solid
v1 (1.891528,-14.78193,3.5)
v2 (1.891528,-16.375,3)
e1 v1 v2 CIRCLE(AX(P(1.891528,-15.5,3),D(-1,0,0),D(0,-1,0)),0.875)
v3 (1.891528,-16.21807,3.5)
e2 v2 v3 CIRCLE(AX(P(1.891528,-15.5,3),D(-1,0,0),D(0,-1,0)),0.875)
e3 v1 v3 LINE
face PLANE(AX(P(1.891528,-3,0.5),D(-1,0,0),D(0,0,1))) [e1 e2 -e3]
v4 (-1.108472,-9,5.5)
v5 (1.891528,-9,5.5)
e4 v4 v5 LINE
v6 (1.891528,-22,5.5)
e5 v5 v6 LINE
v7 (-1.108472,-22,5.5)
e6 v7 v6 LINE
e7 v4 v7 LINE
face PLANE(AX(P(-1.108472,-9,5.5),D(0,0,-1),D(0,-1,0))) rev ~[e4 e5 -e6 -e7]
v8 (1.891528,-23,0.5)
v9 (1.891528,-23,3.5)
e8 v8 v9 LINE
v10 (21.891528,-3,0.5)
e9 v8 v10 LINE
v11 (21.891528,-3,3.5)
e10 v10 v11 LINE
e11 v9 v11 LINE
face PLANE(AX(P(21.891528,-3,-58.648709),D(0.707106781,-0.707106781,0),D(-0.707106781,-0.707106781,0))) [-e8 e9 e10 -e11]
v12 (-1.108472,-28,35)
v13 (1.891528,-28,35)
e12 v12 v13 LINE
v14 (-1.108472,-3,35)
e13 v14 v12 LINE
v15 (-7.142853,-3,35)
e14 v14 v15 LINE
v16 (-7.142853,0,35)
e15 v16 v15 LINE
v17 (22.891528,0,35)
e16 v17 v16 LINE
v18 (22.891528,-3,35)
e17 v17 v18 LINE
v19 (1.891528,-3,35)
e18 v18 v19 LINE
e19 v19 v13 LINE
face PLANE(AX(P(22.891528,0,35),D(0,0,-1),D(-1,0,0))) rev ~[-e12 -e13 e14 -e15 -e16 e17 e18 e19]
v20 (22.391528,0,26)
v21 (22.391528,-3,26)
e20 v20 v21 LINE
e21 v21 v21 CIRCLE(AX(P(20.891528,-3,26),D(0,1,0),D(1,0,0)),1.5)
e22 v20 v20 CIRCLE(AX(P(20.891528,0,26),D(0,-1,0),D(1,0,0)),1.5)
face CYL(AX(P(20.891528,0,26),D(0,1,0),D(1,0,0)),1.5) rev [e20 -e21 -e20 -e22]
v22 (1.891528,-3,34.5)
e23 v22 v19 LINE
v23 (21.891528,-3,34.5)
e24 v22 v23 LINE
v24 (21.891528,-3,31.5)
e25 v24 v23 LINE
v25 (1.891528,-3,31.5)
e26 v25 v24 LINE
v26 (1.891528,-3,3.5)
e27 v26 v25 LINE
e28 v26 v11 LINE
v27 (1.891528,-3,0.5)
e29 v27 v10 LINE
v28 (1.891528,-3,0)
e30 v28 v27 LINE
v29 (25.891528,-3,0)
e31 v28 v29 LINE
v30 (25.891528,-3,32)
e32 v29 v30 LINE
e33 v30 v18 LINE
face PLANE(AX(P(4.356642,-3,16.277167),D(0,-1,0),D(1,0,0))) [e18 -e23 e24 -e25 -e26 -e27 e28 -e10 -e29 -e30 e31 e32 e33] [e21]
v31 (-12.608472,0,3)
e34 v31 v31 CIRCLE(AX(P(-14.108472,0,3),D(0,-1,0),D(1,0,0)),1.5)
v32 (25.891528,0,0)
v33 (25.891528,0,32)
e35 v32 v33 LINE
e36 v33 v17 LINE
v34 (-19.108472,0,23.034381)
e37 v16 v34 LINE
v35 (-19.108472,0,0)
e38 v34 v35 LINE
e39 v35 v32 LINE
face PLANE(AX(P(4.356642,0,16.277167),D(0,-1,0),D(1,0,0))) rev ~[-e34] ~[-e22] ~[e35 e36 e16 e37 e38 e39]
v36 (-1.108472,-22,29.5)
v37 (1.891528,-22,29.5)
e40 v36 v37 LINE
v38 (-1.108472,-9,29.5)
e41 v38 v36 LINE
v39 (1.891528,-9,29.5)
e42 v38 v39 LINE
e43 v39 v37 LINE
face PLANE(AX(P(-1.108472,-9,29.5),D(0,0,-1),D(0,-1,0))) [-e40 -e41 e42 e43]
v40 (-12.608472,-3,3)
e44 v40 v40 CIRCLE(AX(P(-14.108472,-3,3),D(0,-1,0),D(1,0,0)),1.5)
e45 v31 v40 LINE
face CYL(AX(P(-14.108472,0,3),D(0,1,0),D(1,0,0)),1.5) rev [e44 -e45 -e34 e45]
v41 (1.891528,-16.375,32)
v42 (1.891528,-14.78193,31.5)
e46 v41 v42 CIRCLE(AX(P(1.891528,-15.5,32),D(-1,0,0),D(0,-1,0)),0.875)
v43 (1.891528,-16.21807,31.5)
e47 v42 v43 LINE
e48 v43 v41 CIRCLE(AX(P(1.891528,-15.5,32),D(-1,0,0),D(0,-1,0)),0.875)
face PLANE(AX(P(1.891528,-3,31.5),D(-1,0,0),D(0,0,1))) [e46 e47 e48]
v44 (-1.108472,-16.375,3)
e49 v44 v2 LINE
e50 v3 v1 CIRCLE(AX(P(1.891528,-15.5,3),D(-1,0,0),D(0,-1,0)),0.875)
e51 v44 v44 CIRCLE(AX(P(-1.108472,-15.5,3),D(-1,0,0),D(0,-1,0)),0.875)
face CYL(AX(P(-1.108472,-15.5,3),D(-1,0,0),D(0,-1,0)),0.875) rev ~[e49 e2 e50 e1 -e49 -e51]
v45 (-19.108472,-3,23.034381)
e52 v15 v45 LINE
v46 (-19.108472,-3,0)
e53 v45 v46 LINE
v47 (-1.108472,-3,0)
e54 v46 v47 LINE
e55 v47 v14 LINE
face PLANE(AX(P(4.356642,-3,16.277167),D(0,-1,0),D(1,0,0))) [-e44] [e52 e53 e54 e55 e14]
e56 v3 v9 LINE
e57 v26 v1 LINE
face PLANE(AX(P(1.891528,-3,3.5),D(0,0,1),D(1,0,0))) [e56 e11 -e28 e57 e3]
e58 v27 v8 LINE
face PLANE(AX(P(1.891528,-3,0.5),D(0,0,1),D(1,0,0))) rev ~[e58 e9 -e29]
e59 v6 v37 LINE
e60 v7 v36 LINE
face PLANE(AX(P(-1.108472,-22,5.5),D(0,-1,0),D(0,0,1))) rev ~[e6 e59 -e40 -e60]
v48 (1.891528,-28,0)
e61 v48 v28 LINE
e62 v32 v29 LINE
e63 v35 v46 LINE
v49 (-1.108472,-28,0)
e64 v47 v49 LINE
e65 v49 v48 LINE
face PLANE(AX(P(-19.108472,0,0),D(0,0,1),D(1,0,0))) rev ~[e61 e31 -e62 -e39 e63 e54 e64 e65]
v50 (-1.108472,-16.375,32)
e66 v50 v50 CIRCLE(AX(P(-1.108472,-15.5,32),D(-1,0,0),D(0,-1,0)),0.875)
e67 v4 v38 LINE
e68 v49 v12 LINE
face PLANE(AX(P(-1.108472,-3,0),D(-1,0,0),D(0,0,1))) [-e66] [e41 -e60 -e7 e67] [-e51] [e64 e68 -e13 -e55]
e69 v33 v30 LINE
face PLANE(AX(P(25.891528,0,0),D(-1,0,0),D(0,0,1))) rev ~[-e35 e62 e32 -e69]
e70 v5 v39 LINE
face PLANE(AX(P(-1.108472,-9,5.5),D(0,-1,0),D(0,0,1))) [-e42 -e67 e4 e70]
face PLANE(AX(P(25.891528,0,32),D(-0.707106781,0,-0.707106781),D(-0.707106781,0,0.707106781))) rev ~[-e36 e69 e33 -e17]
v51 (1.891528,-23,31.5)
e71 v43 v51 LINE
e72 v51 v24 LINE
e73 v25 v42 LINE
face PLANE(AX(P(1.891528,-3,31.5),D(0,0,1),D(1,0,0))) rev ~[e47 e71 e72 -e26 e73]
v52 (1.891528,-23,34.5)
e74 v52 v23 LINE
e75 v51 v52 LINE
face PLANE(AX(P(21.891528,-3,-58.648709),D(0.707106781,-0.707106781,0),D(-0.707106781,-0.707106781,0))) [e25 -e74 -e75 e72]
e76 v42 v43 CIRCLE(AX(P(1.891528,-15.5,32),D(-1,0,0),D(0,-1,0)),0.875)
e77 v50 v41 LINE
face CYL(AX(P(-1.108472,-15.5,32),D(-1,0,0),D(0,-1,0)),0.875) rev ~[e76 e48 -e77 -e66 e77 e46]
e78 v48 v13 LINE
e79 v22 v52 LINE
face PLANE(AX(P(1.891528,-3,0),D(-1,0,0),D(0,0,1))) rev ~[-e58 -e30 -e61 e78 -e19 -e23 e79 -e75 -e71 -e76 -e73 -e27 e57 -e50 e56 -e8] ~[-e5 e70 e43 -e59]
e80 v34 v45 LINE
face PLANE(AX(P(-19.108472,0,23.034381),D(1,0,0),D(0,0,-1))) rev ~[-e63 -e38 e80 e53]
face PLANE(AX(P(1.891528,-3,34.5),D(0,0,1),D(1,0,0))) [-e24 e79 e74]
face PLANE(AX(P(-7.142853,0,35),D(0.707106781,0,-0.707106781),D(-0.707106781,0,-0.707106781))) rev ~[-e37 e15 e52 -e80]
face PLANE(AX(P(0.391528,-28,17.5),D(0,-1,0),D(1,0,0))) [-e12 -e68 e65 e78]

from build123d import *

# Parameters (mm, degrees)
F0_R        = 1.5
F1_DEPTH    = 3
F2_W        = 3
F2_H        = 35
F3_DEPTH    = 25
F4_W        = 13
F4_H        = 24
F4_R        = 0.875
F5_DEPTH    = 27.001
F6_W        = 20
F6_H        = 3
F7_DEPTH    = 23
F8_T4_DEPTH = 121.2974174464


# Not quite as in the source:
# - a fillet or chamfer that OpenCascade refuses, or shapes differently, is made with other operations: its cross-section is extruded or revolved along the edge and cut away or added
# - a feature of the source that left no trace in its solid (it failed there, or was rolled back) is left out


with BuildPart() as f1:
    # F0 (on Front) → F1 (new body)
    with BuildSketch(Plane.XZ):
        Polygon((-19.1084720148, 23.034380586), (-19.1084720148, 0), (25.8915279852, 0), (25.8915279852, 32), (22.8915279852, 35), (-7.1428526009, 35), align=None)
        with Locations((-14.1084720148, 3)):
            Circle(F0_R, mode=Mode.SUBTRACT)
        with Locations((20.8915279852, 26)):
            Circle(F0_R, mode=Mode.SUBTRACT)
    extrude(amount=F1_DEPTH)

    # F2 (on face) → F3 (join)
    with BuildSketch(Plane.XZ.offset(3)):
        with Locations((0.3915279852, 17.5)):
            Rectangle(F2_W, F2_H)
    extrude(amount=F3_DEPTH)

    # F4 (on face) → F5 (cut, through all)
    with BuildSketch(Plane(origin=(-1.1084720148, 0, 0), x_dir=(0, -1, 0), z_dir=(-1, 0, 0))):
        with Locations((15.5, 17.5)):
            Rectangle(F4_W, F4_H)
        with Locations((15.5, 32)):
            Circle(F4_R)
        with Locations((15.5, 3)):
            Circle(F4_R)
    extrude(amount=-F5_DEPTH, mode=Mode.SUBTRACT)

    # F6 (on face) → F7 (join)
    with BuildSketch(Plane.XZ.offset(3)):
        with Locations((11.8915279852, 33)):
            Rectangle(F6_W, F6_H)
        with Locations((11.8915279852, 2)):
            Rectangle(F6_W, F6_H)
    extrude(amount=F7_DEPTH)

    # F8: chamfer of 23 on 1 edges, made by hand


with BuildPart() as f8_tool2:
    # F8_s3 → F8_t4 (new body)
    with BuildSketch(Plane.XY.offset(-58.6487087232)):
        Polygon((21.8915279852, -3), (-1.1084720148, -26), (21.8915279852, -26), align=None)
    extrude(amount=F8_T4_DEPTH)

    split(bisect_by=Plane.XZ.offset(3), keep=Keep.TOP)

    split(bisect_by=Plane.YZ.offset(1.8915279852), keep=Keep.TOP)


with BuildPart() as f1_1:
    add(f1.part)

    # F8_t1: cut F8_tool2
    add(f8_tool2.part, mode=Mode.SUBTRACT)


solid = f1_1.part
